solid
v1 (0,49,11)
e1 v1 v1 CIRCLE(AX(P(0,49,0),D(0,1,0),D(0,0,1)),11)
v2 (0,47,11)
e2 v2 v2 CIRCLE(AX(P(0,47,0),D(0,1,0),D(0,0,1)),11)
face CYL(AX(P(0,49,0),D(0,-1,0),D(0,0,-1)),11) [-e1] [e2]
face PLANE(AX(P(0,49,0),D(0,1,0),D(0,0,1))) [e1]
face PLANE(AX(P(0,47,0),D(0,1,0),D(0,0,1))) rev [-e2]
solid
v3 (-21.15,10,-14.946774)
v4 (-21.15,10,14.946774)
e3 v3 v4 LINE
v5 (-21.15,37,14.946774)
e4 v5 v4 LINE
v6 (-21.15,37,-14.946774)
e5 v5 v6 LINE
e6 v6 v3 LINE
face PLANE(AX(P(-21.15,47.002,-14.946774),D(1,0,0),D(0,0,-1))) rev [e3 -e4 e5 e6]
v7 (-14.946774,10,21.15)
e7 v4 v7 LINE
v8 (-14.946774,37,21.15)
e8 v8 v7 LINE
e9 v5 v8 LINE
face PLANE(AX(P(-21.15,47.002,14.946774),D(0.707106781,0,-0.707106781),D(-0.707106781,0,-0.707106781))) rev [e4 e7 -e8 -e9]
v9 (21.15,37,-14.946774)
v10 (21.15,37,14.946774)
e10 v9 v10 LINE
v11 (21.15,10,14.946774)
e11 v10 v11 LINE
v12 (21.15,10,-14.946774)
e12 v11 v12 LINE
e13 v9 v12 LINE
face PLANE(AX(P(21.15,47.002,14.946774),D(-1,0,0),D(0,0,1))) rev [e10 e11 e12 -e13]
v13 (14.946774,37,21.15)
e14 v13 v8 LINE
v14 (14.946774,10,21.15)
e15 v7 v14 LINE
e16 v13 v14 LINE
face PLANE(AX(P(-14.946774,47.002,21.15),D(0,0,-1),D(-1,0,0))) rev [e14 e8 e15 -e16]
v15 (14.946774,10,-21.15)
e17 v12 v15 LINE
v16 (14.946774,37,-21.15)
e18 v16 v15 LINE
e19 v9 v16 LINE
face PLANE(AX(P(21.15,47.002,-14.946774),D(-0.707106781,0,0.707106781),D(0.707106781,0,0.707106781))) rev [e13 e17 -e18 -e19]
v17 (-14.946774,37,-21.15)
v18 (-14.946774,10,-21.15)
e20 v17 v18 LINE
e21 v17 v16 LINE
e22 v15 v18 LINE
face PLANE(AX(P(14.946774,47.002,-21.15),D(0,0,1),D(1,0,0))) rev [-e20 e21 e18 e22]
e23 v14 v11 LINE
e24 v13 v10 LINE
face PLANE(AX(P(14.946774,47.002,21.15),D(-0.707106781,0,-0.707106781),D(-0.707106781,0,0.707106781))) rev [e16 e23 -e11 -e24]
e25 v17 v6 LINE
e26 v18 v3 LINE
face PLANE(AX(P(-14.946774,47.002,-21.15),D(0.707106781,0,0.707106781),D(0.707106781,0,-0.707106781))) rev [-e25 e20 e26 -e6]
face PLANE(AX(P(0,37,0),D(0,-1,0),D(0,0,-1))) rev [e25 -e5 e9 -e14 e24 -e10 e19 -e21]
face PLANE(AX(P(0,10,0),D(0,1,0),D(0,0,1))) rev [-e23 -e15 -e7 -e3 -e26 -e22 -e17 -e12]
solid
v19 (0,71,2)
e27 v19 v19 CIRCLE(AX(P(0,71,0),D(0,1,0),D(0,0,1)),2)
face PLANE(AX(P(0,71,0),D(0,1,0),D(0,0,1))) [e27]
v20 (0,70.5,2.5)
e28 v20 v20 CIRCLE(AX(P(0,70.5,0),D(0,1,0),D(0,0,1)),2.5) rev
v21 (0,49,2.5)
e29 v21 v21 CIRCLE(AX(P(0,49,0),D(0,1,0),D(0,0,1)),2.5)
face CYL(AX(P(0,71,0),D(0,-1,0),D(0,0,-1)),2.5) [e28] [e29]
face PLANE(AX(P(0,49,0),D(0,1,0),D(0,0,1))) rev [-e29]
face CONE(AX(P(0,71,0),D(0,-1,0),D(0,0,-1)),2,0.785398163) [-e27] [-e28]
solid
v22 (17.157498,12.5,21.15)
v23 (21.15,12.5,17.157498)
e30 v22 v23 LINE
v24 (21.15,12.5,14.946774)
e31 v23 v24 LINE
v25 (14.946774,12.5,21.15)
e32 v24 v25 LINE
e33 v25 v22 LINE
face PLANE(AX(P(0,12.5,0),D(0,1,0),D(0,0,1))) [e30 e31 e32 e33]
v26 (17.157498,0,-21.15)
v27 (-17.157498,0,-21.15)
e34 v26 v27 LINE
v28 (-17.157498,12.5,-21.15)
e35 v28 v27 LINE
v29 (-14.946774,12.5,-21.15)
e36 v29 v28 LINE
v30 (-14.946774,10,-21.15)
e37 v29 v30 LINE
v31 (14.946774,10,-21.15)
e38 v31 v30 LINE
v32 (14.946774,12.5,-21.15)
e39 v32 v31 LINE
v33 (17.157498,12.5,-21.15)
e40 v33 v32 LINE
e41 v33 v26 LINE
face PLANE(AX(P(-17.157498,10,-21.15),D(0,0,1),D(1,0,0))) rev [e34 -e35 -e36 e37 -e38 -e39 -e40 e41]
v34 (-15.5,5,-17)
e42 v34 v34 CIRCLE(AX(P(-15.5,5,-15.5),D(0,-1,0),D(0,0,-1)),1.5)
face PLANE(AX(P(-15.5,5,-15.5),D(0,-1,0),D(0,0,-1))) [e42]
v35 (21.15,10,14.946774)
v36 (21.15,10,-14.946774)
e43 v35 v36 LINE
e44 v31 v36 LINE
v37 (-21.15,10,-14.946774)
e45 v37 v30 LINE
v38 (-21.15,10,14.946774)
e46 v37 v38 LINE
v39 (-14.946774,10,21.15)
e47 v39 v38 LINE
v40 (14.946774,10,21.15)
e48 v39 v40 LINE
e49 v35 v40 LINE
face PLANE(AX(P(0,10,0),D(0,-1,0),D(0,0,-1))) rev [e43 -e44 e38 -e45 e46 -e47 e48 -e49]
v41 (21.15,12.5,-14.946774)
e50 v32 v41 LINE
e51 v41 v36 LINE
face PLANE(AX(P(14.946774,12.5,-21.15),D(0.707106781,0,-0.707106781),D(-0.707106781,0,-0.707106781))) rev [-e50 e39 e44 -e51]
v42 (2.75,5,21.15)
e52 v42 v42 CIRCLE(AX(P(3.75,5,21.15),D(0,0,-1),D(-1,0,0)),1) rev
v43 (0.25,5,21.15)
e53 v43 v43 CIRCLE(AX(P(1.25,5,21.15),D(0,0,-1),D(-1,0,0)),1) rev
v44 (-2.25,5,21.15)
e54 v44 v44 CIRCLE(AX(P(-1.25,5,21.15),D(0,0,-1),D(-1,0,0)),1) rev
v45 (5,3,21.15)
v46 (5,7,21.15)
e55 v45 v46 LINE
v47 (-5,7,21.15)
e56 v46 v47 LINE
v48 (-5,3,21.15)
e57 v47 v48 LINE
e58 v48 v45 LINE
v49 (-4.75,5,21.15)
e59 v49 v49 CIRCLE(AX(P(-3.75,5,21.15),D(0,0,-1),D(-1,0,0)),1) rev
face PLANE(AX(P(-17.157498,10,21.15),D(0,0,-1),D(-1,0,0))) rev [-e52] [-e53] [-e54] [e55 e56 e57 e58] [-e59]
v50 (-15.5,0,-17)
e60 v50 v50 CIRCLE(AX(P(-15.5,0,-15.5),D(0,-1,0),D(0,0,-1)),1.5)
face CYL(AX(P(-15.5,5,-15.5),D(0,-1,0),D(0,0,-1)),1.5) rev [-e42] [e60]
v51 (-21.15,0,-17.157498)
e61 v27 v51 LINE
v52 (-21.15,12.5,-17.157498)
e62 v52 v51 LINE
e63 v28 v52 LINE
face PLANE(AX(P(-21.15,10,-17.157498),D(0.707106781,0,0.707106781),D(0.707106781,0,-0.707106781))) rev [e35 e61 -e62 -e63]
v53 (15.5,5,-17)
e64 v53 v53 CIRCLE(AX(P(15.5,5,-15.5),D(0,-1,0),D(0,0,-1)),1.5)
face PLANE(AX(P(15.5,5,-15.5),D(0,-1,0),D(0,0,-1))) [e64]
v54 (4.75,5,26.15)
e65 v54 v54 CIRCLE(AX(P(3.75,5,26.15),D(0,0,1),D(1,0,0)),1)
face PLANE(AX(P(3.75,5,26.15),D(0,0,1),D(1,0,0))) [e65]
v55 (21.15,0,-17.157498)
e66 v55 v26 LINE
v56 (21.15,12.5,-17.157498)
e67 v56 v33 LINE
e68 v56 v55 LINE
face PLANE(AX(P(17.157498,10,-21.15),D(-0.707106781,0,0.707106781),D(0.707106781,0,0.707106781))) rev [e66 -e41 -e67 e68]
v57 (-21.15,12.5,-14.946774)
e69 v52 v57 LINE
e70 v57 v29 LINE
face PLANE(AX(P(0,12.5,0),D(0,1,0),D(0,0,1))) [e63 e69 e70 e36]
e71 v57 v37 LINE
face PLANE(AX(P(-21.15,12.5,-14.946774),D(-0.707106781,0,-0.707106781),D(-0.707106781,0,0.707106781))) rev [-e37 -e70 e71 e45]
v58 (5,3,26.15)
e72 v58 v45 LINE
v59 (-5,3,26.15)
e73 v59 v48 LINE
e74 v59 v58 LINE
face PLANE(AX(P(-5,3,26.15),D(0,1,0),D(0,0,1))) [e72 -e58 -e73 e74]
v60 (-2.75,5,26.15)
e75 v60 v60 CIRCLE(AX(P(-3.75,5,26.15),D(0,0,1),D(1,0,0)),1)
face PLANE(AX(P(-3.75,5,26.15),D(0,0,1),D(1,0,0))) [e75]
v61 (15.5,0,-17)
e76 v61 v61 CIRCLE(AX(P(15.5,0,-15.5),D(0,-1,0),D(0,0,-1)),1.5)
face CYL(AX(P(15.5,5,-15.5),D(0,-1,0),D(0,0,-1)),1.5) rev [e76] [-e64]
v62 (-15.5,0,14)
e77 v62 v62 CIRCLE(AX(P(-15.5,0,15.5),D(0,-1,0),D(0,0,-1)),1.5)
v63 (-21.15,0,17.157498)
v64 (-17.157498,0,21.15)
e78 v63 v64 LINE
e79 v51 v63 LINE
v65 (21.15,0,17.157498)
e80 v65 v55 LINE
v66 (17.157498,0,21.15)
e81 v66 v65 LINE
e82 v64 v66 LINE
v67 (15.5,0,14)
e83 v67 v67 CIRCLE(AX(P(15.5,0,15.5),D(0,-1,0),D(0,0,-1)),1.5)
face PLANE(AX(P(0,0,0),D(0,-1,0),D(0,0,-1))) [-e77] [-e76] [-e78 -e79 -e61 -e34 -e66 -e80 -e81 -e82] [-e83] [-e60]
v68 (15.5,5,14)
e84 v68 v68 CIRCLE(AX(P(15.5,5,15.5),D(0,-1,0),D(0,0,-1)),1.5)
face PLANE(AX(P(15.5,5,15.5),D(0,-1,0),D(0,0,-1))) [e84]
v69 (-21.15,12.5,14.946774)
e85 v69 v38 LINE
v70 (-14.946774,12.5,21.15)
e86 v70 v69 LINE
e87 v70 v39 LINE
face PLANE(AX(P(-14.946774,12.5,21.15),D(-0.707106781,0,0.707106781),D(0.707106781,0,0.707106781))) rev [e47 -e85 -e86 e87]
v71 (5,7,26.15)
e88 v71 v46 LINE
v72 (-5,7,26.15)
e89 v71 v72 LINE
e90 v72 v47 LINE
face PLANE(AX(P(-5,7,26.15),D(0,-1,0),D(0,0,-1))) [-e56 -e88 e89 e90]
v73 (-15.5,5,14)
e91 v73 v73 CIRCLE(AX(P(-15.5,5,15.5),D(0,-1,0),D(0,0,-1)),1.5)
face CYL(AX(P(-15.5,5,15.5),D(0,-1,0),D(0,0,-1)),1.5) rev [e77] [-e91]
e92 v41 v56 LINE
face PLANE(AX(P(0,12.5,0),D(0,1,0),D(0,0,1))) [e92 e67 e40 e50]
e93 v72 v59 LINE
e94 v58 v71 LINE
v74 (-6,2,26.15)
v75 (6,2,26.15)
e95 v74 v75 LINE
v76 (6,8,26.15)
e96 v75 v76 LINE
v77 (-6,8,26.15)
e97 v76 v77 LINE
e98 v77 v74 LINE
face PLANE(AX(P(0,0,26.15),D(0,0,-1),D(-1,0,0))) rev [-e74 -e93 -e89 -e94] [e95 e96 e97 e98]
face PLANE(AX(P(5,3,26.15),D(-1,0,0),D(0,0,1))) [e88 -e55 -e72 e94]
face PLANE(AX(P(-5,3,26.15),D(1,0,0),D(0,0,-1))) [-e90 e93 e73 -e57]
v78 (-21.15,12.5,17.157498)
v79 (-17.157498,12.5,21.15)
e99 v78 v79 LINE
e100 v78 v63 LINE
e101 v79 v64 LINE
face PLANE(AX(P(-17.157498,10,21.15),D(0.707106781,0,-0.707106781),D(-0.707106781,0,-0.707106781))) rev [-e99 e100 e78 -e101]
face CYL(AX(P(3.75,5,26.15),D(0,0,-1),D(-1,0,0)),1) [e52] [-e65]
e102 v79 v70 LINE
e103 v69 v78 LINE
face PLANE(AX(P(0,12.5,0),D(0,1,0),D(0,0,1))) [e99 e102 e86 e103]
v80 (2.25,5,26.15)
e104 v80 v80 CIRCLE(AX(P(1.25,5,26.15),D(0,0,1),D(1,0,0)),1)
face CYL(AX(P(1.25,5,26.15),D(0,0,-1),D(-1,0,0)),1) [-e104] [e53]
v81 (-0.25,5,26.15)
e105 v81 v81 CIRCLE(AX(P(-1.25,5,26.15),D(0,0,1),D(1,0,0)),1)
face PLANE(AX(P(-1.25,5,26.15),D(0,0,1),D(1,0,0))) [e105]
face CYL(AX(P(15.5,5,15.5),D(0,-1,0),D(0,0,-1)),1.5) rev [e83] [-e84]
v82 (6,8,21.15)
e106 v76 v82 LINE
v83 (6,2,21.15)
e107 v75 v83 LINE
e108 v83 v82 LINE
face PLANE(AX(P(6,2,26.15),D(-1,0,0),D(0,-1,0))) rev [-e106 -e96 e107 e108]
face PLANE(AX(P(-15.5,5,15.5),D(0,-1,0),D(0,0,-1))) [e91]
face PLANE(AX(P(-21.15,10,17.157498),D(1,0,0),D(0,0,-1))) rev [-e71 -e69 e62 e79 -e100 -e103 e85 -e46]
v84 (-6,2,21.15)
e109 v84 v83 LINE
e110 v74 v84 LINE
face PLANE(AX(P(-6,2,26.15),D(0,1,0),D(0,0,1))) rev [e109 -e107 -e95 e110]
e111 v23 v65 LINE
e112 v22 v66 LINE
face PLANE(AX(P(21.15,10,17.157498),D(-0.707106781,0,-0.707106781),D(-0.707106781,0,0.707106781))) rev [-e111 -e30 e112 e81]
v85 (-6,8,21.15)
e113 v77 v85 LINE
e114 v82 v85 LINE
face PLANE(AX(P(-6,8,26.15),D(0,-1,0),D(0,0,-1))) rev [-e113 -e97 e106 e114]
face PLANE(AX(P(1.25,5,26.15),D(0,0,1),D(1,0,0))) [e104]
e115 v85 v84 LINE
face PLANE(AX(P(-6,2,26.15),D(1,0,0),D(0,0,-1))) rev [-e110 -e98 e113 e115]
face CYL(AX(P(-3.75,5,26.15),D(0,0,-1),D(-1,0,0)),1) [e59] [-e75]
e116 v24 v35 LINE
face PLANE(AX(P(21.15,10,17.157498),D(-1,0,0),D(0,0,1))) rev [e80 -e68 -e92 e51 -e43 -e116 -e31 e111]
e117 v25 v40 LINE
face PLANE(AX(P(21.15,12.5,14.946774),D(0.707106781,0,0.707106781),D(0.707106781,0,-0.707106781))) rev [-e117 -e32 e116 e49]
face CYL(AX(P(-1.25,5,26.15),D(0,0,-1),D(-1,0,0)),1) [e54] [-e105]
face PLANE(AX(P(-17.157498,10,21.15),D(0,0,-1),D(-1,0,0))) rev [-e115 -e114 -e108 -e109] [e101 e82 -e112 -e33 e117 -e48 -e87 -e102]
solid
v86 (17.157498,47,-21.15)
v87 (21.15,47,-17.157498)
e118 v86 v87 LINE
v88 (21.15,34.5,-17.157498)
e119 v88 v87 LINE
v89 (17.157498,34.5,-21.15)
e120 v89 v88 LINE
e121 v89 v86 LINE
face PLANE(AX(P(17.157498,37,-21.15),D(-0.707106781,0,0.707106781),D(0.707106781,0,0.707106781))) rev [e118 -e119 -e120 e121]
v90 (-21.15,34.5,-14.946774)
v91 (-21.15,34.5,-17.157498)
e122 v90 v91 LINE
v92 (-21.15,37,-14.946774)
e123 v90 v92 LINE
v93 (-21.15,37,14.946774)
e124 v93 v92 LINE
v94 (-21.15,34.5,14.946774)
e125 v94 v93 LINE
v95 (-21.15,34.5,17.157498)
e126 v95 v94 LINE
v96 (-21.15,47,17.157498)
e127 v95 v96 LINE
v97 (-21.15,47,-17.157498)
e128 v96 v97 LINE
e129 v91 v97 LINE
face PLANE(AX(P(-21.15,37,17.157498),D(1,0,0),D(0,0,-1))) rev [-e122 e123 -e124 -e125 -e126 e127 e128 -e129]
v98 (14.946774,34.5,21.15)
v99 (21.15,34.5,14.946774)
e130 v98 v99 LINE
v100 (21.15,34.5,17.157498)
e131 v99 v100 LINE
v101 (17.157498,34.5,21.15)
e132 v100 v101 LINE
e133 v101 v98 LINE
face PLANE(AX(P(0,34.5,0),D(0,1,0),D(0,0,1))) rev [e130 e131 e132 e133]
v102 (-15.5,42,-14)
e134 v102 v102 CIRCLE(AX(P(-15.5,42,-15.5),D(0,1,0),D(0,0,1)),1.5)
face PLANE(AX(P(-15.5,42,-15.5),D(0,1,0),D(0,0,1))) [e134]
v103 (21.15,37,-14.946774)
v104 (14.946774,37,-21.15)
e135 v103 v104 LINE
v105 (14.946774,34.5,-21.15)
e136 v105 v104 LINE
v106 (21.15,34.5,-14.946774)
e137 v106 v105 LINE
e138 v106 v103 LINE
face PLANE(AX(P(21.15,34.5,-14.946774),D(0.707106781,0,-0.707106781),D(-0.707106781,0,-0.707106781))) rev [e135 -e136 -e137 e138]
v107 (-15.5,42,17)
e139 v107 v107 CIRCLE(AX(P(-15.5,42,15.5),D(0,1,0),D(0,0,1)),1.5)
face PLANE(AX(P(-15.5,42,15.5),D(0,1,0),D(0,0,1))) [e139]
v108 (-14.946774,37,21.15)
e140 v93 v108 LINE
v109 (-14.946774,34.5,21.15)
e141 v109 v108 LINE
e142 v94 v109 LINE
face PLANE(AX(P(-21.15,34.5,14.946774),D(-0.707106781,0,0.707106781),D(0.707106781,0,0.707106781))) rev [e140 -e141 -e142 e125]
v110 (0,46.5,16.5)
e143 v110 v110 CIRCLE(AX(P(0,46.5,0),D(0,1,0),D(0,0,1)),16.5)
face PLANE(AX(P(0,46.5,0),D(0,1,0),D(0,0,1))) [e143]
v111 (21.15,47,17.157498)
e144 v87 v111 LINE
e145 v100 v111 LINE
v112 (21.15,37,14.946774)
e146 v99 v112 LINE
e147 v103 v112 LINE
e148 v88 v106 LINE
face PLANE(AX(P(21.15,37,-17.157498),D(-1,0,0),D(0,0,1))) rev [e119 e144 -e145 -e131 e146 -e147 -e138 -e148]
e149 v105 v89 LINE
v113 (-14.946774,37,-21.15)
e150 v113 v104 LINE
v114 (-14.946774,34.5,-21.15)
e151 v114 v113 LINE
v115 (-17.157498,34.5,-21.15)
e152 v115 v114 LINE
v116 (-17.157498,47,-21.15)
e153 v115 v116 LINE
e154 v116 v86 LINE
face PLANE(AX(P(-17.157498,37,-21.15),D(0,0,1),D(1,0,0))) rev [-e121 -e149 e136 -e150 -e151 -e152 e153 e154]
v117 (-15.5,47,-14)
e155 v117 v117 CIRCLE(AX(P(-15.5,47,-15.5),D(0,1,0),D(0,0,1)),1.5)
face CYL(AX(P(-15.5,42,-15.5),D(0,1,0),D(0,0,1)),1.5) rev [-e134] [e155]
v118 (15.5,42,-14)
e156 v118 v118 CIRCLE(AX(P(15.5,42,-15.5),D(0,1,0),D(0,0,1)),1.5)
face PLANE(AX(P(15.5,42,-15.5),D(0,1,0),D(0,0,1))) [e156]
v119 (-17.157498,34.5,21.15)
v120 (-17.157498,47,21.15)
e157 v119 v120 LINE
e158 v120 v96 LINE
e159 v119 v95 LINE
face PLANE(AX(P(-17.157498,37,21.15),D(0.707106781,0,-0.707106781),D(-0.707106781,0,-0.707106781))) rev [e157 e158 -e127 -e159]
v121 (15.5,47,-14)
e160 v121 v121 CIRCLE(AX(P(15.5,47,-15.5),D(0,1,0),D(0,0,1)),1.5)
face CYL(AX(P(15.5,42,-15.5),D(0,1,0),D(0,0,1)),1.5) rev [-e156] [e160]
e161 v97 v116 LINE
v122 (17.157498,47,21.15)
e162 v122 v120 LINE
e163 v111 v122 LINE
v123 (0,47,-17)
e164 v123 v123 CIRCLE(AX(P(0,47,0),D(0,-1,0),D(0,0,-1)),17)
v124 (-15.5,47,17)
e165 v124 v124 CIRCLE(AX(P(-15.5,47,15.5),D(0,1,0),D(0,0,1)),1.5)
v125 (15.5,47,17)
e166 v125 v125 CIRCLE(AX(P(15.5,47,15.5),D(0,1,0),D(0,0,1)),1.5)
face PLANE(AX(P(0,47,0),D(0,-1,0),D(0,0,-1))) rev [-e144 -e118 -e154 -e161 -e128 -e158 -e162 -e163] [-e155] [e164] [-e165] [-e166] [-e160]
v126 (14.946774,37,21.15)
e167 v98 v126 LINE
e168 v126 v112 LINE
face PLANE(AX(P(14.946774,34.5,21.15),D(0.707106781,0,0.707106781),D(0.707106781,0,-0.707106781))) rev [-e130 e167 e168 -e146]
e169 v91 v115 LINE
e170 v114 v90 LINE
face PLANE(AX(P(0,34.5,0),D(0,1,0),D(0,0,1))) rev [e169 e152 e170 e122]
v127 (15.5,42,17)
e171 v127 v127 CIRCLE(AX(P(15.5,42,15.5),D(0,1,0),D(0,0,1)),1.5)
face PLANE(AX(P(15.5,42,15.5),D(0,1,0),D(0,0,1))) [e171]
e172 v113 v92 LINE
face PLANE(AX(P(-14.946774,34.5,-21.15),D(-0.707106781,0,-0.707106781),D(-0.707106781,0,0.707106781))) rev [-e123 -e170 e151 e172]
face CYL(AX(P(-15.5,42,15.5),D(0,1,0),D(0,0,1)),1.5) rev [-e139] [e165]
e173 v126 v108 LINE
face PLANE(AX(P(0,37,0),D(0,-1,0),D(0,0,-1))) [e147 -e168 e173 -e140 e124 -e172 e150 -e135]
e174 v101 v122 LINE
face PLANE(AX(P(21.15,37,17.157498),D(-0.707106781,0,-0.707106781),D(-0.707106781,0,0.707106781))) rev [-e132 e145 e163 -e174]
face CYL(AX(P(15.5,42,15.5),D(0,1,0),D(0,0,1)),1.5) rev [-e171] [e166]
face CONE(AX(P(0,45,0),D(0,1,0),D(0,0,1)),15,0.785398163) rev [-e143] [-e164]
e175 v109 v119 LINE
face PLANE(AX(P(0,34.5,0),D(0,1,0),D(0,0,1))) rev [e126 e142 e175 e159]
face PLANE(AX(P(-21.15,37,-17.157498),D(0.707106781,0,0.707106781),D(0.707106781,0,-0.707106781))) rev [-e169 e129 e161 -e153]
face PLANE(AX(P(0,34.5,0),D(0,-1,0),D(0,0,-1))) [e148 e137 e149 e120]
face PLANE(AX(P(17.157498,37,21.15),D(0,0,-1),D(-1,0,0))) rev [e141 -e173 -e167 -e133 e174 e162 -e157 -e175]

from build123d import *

# Parameters (mm, degrees)
BOSS_EXTRUDE1_DEPTH  = 10
BOSS_EXTRUDE2_DEPTH  = 2.5
BOSS_EXTRUDE6_DEPTH  = 10
BOSS_EXTRUDE7_DEPTH  = 2.5
BOSS_EXTRUDE8_REACH  = 49.578
SKETCH8_R            = 11
BOSS_EXTRUDE9_DEPTH  = 2
SKETCH9_R            = 2.5
BOSS_EXTRUDE10_DEPTH = 22
CHAMFER1_SIZE        = 0.5
SKETCH10_R           = 1.5
CUT_EXTRUDE1_DEPTH   = 5
SKETCH11_R           = 1.5
CUT_EXTRUDE2_DEPTH   = 5
SKETCH12_R           = 15
CUT_EXTRUDE3_DEPTH   = 0.5
CHAMFER2_SIZE        = 2
SKETCH13_W           = 12
SKETCH13_H           = 6
SKETCH13_W_2         = 10
SKETCH13_H_2         = 4
BOSS_EXTRUDE11_DEPTH = 5
SKETCH14_R           = 1
BOSS_EXTRUDE12_DEPTH = 5


with BuildPart() as part:
    # Sketch1 → Boss-Extrude1 (new body)
    with BuildSketch(Plane(origin=(0, 0, 0), x_dir=(1, 0, 0), z_dir=(0, 1, 0))):
        Polygon((-21.15, 17.157498476), (-17.157498476, 21.15), (17.157498476, 21.15), (21.15, 17.157498476), (21.15, -17.157498476), (17.157498476, -21.15), (-17.157498476, -21.15), (-21.15, -17.157498476), align=None)
    extrude(amount=BOSS_EXTRUDE1_DEPTH)

    # Sketch2 → Boss-Extrude2 (add)
    with BuildSketch(Plane(origin=(0, 10, 0), x_dir=(1, 0, 0), z_dir=(0, 1, 0))):
        Polygon((-17.157498476, 21.15), (-21.15, 17.157498476), (-21.15, 14.946774472), (-14.946774472, 21.15), align=None)
        Polygon((21.15, 17.157498476), (17.157498476, 21.15), (14.946774472, 21.15), (21.15, 14.946774472), align=None)
        Polygon((17.157498476, -21.15), (21.15, -17.157498476), (21.15, -14.946774472), (14.946774472, -21.15), align=None)
        Polygon((-21.15, -17.157498476), (-17.157498476, -21.15), (-14.946774472, -21.15), (-21.15, -14.946774472), align=None)
    extrude(amount=BOSS_EXTRUDE2_DEPTH)

    # Sketch11 → Cut-Extrude2 (cut)
    with BuildSketch(Plane.XZ):
        with Locations(Location((-15.5, 15.5, 0), (0, 0, 90))):
            Circle(SKETCH11_R)
        with Locations(Location((15.5, 15.5, 0), (0, 0, 90))):
            Circle(SKETCH11_R)
        with Locations(Location((15.5, -15.5, 0), (0, 0, 90))):
            Circle(SKETCH11_R)
        with Locations(Location((-15.5, -15.5, 0), (0, 0, 90))):
            Circle(SKETCH11_R)
    extrude(amount=-CUT_EXTRUDE2_DEPTH, mode=Mode.SUBTRACT)

    # Sketch13 → Boss-Extrude11 (add)
    with BuildSketch(Plane.XY.offset(21.15)):
        with Locations((0, 5)):
            Rectangle(SKETCH13_W, SKETCH13_H)
        with Locations((0, 5)):
            Rectangle(SKETCH13_W_2, SKETCH13_H_2, mode=Mode.SUBTRACT)
    extrude(amount=BOSS_EXTRUDE11_DEPTH)

    # Sketch14 → Boss-Extrude12 (add)
    with BuildSketch(Plane.XY.offset(21.15)):
        with Locations(Location((-3.75, 5, 0), (0, 0, 180))):
            Circle(SKETCH14_R)
        with Locations(Location((-1.25, 5, 0), (0, 0, 180))):
            Circle(SKETCH14_R)
        with Locations(Location((1.25, 5, 0), (0, 0, 180))):
            Circle(SKETCH14_R)
        with Locations(Location((3.75, 5, 0), (0, 0, 180))):
            Circle(SKETCH14_R)
    extrude(amount=BOSS_EXTRUDE12_DEPTH)


with BuildPart() as body_2:
    # Sketch6 → Boss-Extrude6 (new body)
    with BuildSketch(Plane(origin=(0, 47, 0), x_dir=(-1, 0, 0), z_dir=(0, -1, 0))):
        Polygon((-17.157498476, -21.15), (17.157498476, -21.15), (21.15, -17.157498476), (21.15, 17.157498476), (17.157498476, 21.15), (-17.157498476, 21.15), (-21.15, 17.157498476), (-21.15, -17.157498476), align=None)
    extrude(amount=BOSS_EXTRUDE6_DEPTH)

    # Sketch7 → Boss-Extrude7 (add)
    with BuildSketch(Plane.XZ.offset(-37)):
        Polygon((-21.15, -17.157498476), (-17.157498476, -21.15), (-14.946774472, -21.15), (-21.15, -14.946774472), align=None)
        Polygon((-17.157498476, 21.15), (-21.15, 17.157498476), (-21.15, 14.946774472), (-14.946774472, 21.15), align=None)
        Polygon((21.15, 17.157498476), (17.157498476, 21.15), (14.946774472, 21.15), (21.15, 14.946774472), align=None)
        Polygon((21.15, -14.946774472), (14.946774472, -21.15), (17.157498476, -21.15), (21.15, -17.157498476), align=None)
    extrude(amount=BOSS_EXTRUDE7_DEPTH)


with BuildPart() as body_3:

    # Sketch3 → Boss-Extrude8 (new, up to next)
    with BuildSketch(Plane(origin=(0, 10, 0), x_dir=(1, 0, 0), z_dir=(0, 1, 0)), mode=Mode.PRIVATE) as boss_extrude8_sk1:
        Polygon((-21.15, -14.946774472), (-14.946774472, -21.15), (14.946774472, -21.15), (21.15, -14.946774472), (21.15, 14.946774472), (14.946774472, 21.15), (-14.946774472, 21.15), (-21.15, 14.946774472), align=None)
    boss_extrude8_tool1 = extrude(boss_extrude8_sk1.sketch, amount=BOSS_EXTRUDE8_REACH, mode=Mode.PRIVATE) - body_2.part
    add(boss_extrude8_tool1.solids().sort_by_distance((0, 10, 0))[0])


with BuildPart() as body_4:
    # Sketch8 → Boss-Extrude9 (new body)
    with BuildSketch(Plane(origin=(0, 47, 0), x_dir=(1, 0, 0), z_dir=(0, 1, 0))):
        with Locations(Location((0, 0, 0), (0, 0, 270))):
            Circle(SKETCH8_R)
    extrude(amount=BOSS_EXTRUDE9_DEPTH)


with BuildPart() as body_5:
    # Sketch9 → Boss-Extrude10 (new body)
    with BuildSketch(Plane(origin=(0, 49, 0), x_dir=(1, 0, 0), z_dir=(0, 1, 0))):
        with Locations(Location((0, 0, 0), (0, 0, 270))):
            Circle(SKETCH9_R)
    extrude(amount=BOSS_EXTRUDE10_DEPTH)

    # Chamfer1
    chamfer1_edges = [body_5.edges().sort_by_distance(p)[0] for p in [
        (0, 71, -2.5),
    ]]
    chamfer(chamfer1_edges, length=CHAMFER1_SIZE)


with BuildPart() as body_2_1:
    add(body_2.part)

    # Sketch10 → Cut-Extrude1 (cut)
    with BuildSketch(Plane(origin=(0, 47, 0), x_dir=(1, 0, 0), z_dir=(0, 1, 0))):
        with Locations(Location((-15.5, 15.5, 0), (0, 0, 270))):
            Circle(SKETCH10_R)
        with Locations(Location((15.5, 15.5, 0), (0, 0, 270))):
            Circle(SKETCH10_R)
        with Locations(Location((15.5, -15.5, 0), (0, 0, 270))):
            Circle(SKETCH10_R)
        with Locations(Location((-15.5, -15.5, 0), (0, 0, 270))):
            Circle(SKETCH10_R)
    extrude(amount=-CUT_EXTRUDE1_DEPTH, mode=Mode.SUBTRACT)

    # Sketch12 → Cut-Extrude3 (cut)
    with BuildSketch(Plane(origin=(0, 47, 0), x_dir=(1, 0, 0), z_dir=(0, 1, 0))):
        with Locations(Location((0, 0, 0), (0, 0, 270))):
            Circle(SKETCH12_R)
    extrude(amount=-CUT_EXTRUDE3_DEPTH, mode=Mode.SUBTRACT)

    # Chamfer2
    # the kernel refuses this chamfer: 2 mm, written as the material it takes off along each edge
    with BuildSketch(Plane(origin=(0, 47, 0), x_dir=(0, 0, 1), z_dir=(-1, 0, 0))) as chamfer2_piece_1_section:
        Polygon((15 + CHAMFER2_SIZE, 0), (15, -CHAMFER2_SIZE), (15, 0), align=None)
    chamfer2_piece_1 = revolve(axis=Axis((0, 47, 0), (0, 1, 0)), mode=Mode.PRIVATE)
    chamfer2_piece_1 = split(chamfer2_piece_1, bisect_by=Plane(origin=(0, 46.5, -16.745546596), z_dir=(0, 1, 0)), keep=Keep.TOP, mode=Mode.PRIVATE)
    add(chamfer2_piece_1, mode=Mode.SUBTRACT)


solid = Compound([part.part, body_3.part, body_4.part, body_5.part, body_2_1.part])
